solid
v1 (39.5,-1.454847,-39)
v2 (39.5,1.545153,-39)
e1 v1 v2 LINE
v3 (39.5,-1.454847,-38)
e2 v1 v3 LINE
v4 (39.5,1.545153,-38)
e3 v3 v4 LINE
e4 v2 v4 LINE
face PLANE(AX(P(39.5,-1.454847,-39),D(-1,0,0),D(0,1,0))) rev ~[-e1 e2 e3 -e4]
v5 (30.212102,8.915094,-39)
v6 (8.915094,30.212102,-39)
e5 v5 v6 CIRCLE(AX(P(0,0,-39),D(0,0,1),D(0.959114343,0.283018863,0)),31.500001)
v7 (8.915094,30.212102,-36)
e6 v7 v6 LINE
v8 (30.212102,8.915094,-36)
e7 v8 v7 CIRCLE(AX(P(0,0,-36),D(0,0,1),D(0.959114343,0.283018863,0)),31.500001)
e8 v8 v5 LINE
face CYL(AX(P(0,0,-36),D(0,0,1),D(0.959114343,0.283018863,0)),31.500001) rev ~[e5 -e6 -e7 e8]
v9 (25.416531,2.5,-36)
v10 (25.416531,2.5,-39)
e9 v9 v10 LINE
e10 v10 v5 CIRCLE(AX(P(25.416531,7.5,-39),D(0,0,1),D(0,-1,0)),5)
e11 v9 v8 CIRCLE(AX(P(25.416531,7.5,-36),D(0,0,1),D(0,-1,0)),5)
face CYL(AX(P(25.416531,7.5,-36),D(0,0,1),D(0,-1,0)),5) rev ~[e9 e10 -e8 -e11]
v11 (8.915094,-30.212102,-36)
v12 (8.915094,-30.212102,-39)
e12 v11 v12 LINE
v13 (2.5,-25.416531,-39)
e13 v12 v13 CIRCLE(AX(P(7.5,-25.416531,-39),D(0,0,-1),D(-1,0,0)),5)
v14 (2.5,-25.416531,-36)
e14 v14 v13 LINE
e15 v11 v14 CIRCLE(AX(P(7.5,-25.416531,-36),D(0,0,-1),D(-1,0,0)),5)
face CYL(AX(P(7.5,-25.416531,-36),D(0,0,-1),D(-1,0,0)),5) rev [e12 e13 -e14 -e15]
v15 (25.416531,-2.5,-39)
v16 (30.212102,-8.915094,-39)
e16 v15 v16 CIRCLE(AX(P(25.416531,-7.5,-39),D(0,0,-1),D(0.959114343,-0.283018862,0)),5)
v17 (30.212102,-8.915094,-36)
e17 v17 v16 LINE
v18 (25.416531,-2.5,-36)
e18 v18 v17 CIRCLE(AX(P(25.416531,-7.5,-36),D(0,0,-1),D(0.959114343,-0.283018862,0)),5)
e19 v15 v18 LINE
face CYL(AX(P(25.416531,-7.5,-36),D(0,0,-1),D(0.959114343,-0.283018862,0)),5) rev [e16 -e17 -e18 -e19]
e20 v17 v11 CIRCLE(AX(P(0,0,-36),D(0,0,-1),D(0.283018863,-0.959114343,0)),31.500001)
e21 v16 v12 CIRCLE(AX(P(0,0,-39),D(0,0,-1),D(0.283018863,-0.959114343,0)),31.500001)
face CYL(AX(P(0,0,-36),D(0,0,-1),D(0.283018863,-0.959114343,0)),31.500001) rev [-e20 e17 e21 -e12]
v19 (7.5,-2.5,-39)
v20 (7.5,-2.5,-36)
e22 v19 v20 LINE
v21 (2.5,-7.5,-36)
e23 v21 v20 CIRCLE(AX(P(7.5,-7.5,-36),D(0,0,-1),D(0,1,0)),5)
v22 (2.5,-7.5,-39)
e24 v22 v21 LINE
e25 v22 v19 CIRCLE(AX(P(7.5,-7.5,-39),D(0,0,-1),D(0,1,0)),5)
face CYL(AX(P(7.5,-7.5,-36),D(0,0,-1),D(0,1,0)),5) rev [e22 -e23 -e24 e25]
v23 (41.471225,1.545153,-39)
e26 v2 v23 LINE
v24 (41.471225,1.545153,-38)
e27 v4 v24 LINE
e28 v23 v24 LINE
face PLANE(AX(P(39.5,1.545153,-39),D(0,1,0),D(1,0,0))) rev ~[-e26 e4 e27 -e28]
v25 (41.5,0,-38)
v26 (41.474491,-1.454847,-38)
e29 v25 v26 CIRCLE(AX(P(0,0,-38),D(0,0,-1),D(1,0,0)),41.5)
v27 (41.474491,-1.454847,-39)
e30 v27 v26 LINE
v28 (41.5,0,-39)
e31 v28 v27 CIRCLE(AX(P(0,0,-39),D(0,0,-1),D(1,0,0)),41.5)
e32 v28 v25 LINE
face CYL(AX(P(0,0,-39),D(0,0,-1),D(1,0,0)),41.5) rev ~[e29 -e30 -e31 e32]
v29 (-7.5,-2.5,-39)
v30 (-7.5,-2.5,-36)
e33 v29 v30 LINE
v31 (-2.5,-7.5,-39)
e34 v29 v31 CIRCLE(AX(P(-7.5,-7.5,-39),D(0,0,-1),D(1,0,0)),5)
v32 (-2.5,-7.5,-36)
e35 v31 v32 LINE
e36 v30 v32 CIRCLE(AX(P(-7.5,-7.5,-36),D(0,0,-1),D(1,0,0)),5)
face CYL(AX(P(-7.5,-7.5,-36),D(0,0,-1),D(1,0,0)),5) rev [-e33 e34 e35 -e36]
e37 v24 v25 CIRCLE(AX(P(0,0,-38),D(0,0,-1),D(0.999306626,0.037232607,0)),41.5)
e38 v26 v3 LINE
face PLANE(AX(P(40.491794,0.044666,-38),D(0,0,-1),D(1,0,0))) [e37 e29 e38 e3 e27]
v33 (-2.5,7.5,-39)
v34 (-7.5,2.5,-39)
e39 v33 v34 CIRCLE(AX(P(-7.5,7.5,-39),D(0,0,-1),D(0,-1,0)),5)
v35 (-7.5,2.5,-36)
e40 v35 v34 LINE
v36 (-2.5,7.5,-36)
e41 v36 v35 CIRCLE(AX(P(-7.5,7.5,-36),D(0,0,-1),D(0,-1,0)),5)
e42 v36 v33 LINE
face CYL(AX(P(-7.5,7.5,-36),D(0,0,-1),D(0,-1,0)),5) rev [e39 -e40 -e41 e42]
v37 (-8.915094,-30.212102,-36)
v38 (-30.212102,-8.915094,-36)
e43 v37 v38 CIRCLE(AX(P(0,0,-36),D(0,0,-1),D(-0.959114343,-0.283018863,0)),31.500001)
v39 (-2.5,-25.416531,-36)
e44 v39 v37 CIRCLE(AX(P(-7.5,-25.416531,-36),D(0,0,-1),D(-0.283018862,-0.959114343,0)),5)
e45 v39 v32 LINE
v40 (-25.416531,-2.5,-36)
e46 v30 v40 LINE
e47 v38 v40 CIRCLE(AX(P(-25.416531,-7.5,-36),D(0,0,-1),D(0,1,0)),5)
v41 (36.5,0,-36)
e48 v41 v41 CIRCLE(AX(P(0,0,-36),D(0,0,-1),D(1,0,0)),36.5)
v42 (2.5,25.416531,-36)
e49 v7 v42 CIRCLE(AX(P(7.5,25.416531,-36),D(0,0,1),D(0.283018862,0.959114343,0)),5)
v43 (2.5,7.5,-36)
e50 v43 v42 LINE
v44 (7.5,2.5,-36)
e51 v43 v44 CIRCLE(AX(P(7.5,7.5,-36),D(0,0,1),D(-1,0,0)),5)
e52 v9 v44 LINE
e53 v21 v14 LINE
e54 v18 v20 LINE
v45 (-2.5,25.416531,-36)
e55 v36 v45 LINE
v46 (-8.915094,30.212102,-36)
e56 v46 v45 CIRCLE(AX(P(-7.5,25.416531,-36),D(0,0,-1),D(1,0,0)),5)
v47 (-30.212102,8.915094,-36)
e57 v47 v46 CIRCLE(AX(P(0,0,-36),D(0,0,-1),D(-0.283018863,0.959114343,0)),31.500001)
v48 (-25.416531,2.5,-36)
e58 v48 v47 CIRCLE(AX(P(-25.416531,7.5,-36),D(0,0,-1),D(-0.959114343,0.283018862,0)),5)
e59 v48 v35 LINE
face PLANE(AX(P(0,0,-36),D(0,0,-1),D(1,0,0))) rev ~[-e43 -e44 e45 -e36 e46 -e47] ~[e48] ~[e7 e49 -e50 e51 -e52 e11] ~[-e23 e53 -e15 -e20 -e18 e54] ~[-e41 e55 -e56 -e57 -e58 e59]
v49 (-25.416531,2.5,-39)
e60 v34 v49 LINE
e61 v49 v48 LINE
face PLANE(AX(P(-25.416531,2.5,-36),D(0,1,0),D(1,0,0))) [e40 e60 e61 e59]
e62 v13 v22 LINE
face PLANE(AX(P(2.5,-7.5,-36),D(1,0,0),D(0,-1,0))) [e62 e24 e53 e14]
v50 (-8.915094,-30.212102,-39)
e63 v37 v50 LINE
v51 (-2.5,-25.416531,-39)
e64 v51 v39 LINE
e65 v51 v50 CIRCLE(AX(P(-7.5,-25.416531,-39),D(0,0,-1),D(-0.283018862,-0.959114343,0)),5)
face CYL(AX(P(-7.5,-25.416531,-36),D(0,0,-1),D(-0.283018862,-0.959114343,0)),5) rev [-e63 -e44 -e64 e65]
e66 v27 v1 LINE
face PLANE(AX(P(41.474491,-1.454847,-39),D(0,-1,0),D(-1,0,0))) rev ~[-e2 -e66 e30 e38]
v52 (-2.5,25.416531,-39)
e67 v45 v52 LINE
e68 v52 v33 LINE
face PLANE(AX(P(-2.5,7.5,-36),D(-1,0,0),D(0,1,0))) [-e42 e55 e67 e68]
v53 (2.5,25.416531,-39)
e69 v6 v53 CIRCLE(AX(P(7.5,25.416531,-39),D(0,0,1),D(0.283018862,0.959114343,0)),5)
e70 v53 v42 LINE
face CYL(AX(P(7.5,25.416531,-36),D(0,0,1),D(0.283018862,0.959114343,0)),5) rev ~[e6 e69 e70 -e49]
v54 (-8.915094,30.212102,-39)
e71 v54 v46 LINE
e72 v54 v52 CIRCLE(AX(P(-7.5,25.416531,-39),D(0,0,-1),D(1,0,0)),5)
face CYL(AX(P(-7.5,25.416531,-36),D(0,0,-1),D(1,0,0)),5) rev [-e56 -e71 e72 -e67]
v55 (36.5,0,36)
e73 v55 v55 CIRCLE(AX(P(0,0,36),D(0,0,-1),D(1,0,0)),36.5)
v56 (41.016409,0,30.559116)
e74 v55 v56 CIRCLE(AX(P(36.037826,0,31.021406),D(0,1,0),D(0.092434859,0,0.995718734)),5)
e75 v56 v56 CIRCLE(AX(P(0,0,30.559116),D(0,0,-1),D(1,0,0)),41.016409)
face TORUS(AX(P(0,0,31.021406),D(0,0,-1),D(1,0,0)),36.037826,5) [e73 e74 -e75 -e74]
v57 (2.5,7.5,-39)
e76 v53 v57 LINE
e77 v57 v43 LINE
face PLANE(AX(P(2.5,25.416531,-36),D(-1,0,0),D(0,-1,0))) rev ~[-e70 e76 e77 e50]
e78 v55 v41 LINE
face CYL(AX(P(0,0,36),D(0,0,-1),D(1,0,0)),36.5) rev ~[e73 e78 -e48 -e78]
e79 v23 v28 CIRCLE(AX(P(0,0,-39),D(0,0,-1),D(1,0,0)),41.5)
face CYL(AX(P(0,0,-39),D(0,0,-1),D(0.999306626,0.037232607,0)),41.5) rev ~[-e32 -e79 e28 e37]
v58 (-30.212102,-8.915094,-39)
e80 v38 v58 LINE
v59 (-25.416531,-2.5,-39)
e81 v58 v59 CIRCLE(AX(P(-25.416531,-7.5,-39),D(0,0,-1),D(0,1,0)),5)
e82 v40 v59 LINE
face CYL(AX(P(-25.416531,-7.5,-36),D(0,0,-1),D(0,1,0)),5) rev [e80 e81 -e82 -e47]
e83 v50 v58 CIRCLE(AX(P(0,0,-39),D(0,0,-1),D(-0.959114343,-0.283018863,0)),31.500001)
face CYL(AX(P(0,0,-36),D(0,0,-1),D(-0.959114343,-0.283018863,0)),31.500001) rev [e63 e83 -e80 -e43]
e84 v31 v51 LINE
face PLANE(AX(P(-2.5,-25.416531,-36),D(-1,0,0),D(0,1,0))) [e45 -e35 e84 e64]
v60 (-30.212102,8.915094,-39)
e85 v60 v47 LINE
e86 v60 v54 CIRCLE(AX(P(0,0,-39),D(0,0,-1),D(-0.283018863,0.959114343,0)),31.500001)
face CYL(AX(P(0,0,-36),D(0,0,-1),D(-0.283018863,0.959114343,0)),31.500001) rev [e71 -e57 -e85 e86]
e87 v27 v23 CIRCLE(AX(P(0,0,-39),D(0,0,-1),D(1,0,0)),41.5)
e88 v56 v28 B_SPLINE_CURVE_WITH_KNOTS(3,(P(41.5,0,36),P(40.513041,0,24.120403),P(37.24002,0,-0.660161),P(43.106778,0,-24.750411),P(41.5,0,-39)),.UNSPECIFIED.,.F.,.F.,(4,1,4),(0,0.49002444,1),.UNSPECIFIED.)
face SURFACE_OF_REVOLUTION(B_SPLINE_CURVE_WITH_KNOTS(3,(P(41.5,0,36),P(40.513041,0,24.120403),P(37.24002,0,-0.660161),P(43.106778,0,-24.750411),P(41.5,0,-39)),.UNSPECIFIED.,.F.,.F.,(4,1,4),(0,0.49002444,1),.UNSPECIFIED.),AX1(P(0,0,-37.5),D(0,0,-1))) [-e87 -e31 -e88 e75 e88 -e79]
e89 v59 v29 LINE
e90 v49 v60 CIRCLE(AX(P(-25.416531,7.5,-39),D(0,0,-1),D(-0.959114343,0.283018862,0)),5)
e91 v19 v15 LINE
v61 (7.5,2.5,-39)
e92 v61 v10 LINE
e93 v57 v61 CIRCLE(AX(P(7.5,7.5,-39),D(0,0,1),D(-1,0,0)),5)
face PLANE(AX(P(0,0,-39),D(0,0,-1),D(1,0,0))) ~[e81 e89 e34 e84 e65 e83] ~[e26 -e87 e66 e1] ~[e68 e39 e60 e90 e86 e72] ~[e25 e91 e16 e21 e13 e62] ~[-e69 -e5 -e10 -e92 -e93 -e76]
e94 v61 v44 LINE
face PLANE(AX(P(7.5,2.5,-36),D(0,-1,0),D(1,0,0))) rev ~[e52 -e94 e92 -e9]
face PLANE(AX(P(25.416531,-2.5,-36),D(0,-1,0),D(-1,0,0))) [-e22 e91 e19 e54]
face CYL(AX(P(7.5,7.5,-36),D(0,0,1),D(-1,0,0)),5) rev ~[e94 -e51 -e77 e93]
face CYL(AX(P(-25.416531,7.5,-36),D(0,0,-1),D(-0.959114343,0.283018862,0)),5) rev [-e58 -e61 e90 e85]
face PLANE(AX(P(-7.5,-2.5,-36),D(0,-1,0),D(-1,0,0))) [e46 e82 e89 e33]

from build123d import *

# Parameters (mm, degrees)
F4_DEPTH = 1
F6_DEPTH = 75


# Not quite as in the source:
# - a fillet or chamfer that OpenCascade refuses, or shapes differently, is made with other operations: its cross-section is extruded or revolved along the edge and cut away or added


with BuildPart() as f1:
    # F0 (on Front) → F1 (revolve)
    with BuildSketch(Plane.XZ):
        with BuildLine():
            Line((36.5, 0), (36.5, -36))
            Line((36.5, -36), (0, -36))
            Line((0, -36), (0, -39))
            Line((0, -39), (36.5, -39))
            Line((36.5, -39), (41.5, -39))
            add(Edge.make_bspline(
                [(41.5, 36), (40.5130405729, 24.1204033311), (37.2400196897, -0.6601610616), (43.1067779162, -24.7504109869), (41.5, -39)],
                knots=[0, 0, 0, 0, 0.4900244398, 1, 1, 1, 1], degree=3))
            Line((41.5, 36), (36.5, 36))
            Line((36.5, 36), (36.5, 0))
        make_face()
    revolve(axis=Axis((0, 0, -37.5), (0, 0, -1)))

    # F2: fillet of radius 5 on 1 edges, made by hand

    # F2_s1 → F2_t2 (revolve, cut)
    with BuildSketch(Plane.XZ):
        with BuildLine():
            ThreePointArc((36.5, 36), (39.8850667362, 34.2149523953), (41.0164086347, 30.5591163393))
            Line((41.0164086347, 30.5591163393), (41.1159802932, 30.5498705395))
            ThreePointArc((41.1159802932, 30.5498705395), (41.3643970641, 33.2700710676), (41.5996566603, 35.9917205034))
            Line((41.5996566603, 35.9917205034), (41.5, 36.1))
            ThreePointArc((41.5, 36.1), (39, 36.1), (36.5092434859, 36.0995718734))
            Line((36.5092434859, 36.0995718734), (36.5, 36))
        make_face()
    revolve(axis=Axis((0, 0, 36), (0, 0, -1)), mode=Mode.SUBTRACT)

    # F3 (on face) → F4 (cut)
    with BuildSketch(Plane(origin=(0, 0, -39), x_dir=(1, 0, 0), z_dir=(0, 0, -1))):
        with BuildLine():
            ThreePointArc((41.5, 0), (41.4936223113, 0.7275352131), (41.4744912055, 1.4548468121))
            Line((41.4744912055, 1.4548468121), (39.5, 1.4548468121))
            Line((39.5, 1.4548468121), (39.5, -1.5451531879))
            Line((39.5, -1.5451531879), (41.4712249834, -1.5451531879))
            ThreePointArc((41.4712249834, -1.5451531879), (41.4928056223, -0.7727105499), (41.5, 0))
        make_face()
    extrude(amount=-F4_DEPTH, mode=Mode.SUBTRACT)

    # F5 (on face) → F6 (cut, symmetric)
    with BuildSketch(Plane.XY.offset(-36)):
        with BuildLine():
            ThreePointArc((-2.5, 25.4165305825), (-4.5062959033, 29.4212447772), (-8.9150943126, 30.2121022989))
            ThreePointArc((-8.9150943126, 30.2121022989), (-22.2738639656, 22.2738639656), (-30.2121022989, 8.9150943126))
            ThreePointArc((-30.2121022989, 8.9150943126), (-29.4212447772, 4.5062959033), (-25.4165305825, 2.5))
            Line((-25.4165305825, 2.5), (-7.5, 2.5))
            ThreePointArc((-7.5, 2.5), (-3.9644660941, 3.9644660941), (-2.5, 7.5))
            Line((-2.5, 7.5), (-2.5, 25.4165305825))
        make_face()
        with BuildLine():
            ThreePointArc((-8.9150943126, -30.2121022989), (-4.5062959033, -29.4212447772), (-2.5, -25.4165305825))
            Line((-2.5, -25.4165305825), (-2.5, -7.5))
            ThreePointArc((-2.5, -7.5), (-3.9644660941, -3.9644660941), (-7.5, -2.5))
            Line((-7.5, -2.5), (-25.4165305825, -2.5))
            ThreePointArc((-25.4165305825, -2.5), (-29.4212447772, -4.5062959033), (-30.2121022989, -8.9150943126))
            ThreePointArc((-30.2121022989, -8.9150943126), (-22.2738639656, -22.2738639656), (-8.9150943126, -30.2121022989))
        make_face()
        with BuildLine():
            ThreePointArc((30.2121022989, -8.9150943126), (29.4212447772, -4.5062959033), (25.4165305825, -2.5))
            Line((25.4165305825, -2.5), (7.5, -2.5))
            ThreePointArc((7.5, -2.5), (3.9644660941, -3.9644660941), (2.5, -7.5))
            Line((2.5, -7.5), (2.5, -25.4165305825))
            ThreePointArc((2.5, -25.4165305825), (4.5062959033, -29.4212447772), (8.9150943126, -30.2121022989))
            ThreePointArc((8.9150943126, -30.2121022989), (22.2738639656, -22.2738639656), (30.2121022989, -8.9150943126))
        make_face()
        with BuildLine():
            ThreePointArc((8.9150943126, 30.2121022989), (4.5062959033, 29.4212447772), (2.5, 25.4165305825))
            Line((2.5, 25.4165305825), (2.5, 7.5))
            ThreePointArc((2.5, 7.5), (3.9644660941, 3.9644660941), (7.5, 2.5))
            Line((7.5, 2.5), (25.4165305825, 2.5))
            ThreePointArc((25.4165305825, 2.5), (29.4212447772, 4.5062959033), (30.2121022989, 8.9150943126))
            ThreePointArc((30.2121022989, 8.9150943126), (22.2738639656, 22.2738639656), (8.9150943126, 30.2121022989))
        make_face()
    extrude(amount=F6_DEPTH, both=True, mode=Mode.SUBTRACT)


solid = f1.part
